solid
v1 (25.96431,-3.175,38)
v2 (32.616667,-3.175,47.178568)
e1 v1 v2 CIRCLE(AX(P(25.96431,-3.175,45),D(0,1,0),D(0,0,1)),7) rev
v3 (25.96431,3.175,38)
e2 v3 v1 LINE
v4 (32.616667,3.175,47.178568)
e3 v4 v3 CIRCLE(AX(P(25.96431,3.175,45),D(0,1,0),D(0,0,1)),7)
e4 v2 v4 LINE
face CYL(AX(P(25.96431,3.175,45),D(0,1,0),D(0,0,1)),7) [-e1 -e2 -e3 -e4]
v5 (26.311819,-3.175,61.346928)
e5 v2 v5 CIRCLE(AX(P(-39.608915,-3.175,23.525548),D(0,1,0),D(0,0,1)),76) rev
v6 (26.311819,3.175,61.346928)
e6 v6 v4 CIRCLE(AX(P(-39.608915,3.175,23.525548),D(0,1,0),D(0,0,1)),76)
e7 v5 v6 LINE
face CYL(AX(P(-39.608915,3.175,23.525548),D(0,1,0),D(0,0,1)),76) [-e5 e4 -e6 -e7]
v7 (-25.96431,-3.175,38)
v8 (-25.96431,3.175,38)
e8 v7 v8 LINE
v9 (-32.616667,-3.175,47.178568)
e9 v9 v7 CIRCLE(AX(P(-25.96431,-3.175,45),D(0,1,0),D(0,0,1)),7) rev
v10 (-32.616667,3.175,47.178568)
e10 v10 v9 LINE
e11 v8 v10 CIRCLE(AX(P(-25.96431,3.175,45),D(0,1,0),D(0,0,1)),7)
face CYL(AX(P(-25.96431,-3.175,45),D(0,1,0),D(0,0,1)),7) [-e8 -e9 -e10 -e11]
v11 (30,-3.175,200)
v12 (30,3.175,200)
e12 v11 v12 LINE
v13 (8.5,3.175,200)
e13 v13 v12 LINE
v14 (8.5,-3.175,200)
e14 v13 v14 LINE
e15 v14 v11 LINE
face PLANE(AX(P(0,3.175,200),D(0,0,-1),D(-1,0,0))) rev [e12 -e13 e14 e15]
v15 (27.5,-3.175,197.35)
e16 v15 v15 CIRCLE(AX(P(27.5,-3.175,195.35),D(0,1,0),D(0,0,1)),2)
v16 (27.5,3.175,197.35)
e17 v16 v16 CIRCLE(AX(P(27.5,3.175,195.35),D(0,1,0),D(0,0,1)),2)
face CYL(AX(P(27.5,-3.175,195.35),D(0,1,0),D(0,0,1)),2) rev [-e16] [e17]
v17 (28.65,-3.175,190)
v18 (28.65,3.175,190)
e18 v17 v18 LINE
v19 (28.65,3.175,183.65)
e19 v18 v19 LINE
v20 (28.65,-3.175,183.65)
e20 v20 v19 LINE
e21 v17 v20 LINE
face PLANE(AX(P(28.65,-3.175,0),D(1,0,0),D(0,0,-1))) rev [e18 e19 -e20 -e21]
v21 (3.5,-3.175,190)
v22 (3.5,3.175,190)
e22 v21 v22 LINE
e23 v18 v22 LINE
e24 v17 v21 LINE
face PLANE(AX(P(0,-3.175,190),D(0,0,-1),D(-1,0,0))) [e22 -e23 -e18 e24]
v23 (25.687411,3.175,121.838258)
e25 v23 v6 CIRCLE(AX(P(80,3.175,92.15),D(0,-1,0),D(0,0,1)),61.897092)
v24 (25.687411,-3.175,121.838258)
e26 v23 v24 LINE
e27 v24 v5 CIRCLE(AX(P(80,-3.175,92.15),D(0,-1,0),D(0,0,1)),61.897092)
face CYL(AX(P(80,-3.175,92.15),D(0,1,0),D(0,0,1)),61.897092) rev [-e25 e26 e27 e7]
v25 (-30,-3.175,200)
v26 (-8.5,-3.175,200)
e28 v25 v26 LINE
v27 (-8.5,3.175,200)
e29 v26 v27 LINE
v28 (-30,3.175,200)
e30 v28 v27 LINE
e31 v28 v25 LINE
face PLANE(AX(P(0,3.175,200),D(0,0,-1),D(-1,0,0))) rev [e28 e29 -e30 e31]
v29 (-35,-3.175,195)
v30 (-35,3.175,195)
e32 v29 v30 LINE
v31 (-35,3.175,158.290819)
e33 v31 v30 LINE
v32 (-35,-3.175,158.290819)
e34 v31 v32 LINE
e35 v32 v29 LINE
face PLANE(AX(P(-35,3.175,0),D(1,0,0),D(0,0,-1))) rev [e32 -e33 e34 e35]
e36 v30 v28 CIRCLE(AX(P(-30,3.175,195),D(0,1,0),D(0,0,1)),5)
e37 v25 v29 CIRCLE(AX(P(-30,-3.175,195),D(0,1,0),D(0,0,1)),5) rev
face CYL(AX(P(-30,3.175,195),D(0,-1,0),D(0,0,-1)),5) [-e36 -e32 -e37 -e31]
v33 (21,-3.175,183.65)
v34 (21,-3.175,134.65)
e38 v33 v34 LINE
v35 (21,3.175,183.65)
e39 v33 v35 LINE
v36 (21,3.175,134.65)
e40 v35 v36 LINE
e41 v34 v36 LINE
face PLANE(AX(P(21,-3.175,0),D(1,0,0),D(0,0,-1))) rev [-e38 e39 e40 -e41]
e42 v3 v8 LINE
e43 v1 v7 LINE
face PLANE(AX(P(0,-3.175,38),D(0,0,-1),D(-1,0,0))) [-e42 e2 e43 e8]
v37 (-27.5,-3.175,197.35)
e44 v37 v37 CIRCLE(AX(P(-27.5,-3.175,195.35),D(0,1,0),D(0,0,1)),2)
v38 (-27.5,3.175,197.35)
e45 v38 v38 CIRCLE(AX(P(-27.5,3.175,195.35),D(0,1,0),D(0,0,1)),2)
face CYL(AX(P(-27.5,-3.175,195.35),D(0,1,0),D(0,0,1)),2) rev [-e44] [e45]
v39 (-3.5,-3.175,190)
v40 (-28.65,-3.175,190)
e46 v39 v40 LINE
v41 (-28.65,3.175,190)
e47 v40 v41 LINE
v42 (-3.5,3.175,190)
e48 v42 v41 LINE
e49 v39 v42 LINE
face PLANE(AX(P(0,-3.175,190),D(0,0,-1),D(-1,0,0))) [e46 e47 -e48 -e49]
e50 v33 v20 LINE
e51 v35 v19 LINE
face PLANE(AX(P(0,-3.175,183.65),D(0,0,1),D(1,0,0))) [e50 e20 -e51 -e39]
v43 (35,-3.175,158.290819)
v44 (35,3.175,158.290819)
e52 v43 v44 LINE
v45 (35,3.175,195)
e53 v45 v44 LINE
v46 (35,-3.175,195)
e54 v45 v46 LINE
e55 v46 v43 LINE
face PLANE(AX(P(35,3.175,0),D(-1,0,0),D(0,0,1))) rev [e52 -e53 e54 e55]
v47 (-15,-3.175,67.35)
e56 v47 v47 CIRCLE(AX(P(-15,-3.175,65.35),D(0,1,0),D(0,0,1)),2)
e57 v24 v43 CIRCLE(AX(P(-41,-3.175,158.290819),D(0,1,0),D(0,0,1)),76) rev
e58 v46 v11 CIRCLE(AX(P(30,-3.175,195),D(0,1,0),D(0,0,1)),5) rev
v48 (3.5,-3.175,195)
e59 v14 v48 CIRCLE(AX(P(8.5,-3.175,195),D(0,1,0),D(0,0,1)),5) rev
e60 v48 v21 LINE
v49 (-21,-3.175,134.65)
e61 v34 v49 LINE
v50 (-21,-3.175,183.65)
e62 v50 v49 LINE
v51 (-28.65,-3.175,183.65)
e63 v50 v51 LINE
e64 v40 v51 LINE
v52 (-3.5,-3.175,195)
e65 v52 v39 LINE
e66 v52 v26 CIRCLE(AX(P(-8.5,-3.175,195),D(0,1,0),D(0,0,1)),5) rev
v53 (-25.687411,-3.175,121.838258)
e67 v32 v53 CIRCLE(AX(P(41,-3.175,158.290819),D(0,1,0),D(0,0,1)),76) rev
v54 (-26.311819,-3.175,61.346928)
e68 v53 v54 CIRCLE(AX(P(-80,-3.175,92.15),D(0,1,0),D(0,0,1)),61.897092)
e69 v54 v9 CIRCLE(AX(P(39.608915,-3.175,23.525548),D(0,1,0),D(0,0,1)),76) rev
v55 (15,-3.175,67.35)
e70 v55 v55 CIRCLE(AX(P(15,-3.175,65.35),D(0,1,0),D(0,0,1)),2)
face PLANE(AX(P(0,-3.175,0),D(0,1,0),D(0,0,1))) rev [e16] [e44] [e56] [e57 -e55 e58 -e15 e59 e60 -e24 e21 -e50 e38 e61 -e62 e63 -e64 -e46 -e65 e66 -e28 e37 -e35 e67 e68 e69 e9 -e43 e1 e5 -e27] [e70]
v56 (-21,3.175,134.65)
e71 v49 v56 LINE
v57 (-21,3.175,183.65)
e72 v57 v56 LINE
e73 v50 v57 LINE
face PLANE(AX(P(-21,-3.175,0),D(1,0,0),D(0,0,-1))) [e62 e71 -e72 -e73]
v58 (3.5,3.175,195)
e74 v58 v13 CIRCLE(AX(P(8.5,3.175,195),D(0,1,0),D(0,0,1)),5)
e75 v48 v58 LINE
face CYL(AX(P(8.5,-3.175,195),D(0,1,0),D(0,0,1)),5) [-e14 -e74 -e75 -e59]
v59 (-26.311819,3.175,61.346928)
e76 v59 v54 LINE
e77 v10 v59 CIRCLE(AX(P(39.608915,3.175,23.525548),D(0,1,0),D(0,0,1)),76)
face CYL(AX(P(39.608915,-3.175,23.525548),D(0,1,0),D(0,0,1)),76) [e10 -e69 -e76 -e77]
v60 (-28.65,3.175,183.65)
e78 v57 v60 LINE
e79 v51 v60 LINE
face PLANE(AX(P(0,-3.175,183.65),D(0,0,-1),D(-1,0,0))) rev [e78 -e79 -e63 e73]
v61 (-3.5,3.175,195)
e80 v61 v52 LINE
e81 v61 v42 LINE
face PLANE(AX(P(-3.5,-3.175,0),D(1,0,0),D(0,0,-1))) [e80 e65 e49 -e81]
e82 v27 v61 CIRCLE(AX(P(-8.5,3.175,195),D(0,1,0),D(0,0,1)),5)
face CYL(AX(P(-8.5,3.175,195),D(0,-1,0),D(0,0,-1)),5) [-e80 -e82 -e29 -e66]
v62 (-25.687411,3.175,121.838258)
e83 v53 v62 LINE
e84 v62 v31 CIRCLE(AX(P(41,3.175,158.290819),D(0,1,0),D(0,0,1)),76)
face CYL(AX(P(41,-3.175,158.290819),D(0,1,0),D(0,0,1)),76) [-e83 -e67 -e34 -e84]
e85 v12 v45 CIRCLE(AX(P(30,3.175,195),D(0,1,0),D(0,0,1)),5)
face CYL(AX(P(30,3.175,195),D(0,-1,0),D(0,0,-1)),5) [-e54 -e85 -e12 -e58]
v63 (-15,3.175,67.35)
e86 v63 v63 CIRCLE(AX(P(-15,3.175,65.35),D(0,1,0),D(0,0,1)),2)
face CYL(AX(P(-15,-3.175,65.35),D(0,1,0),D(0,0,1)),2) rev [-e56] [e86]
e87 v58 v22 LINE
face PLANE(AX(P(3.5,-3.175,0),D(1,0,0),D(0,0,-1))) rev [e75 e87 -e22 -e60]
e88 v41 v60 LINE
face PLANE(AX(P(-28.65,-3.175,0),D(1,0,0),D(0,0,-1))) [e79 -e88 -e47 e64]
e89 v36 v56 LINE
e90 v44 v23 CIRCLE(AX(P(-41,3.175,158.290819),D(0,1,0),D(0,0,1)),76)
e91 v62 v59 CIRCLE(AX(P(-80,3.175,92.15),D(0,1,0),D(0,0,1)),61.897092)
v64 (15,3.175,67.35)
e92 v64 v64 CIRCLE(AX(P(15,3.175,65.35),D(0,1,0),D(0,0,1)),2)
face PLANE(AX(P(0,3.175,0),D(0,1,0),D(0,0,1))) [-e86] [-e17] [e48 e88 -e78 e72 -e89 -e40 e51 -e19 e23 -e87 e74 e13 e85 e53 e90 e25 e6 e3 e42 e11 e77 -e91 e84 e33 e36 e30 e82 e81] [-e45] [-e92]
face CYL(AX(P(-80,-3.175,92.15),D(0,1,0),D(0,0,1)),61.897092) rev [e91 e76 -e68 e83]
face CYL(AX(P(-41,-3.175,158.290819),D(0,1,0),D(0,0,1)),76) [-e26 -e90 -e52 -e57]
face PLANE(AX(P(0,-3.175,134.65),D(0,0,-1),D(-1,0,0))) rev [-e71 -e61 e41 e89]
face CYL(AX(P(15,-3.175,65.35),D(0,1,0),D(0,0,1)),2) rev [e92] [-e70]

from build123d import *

# Parameters (mm, degrees)
BOSS_EXTRUDE1_DEPTH = 3.175
CUT_EXTRUDE1_DEPTH  = 204.138678001
SKETCH3_W           = 42
SKETCH3_H           = 55.35
SKETCH3_W_2         = 7
SKETCH3_H_2         = 10
SKETCH3_W_3         = 7.65
SKETCH3_H_3         = 6.35
CUT_EXTRUDE2_DEPTH  = 204.138678001
FILLET3_R           = 5
SKETCH4_R           = 2
CUT_EXTRUDE3_DEPTH  = 204.138678001
CUT_EXTRUDE4_DEPTH  = 204.138678001
FILLET4_R           = 76
FILLET5_R           = 7


with BuildPart() as part:
    # Sketch1 → Boss-Extrude1 (new, symmetric)
    with BuildSketch(Plane(origin=(0, 0, 0), x_dir=(1, 0, 0), z_dir=(0, 1, 0))):
        with BuildLine():
            Line((35, -200), (35, 0))
            ThreePointArc((35, 0), (0, 35), (-35, 0))
            Line((-35, 0), (-35, -200))
            Line((-35, -200), (35, -200))
        make_face()
    extrude(amount=BOSS_EXTRUDE1_DEPTH, both=True)

    # Sketch2 → Cut-Extrude1 (cut, through all)
    with BuildSketch(Plane(origin=(0, 3.175, 0), x_dir=(1, 0, 0), z_dir=(0, 1, 0))):
        with BuildLine():
            Line((-35, -38), (35, -38))
            Line((35, -38), (35, 0))
            ThreePointArc((35, 0), (0, 35), (-35, 0))
            Line((-35, 0), (-35, -38))
        make_face()
    extrude(amount=-CUT_EXTRUDE1_DEPTH, mode=Mode.SUBTRACT)

    # Sketch3 → Cut-Extrude2 (cut, through all)
    with BuildSketch(Plane(origin=(0, 3.175, 0), x_dir=(1, 0, 0), z_dir=(0, 1, 0))):
        with Locations((0, -162.325)):
            Rectangle(SKETCH3_W, SKETCH3_H)
        with Locations((0, -195)):
            Rectangle(SKETCH3_W_2, SKETCH3_H_2)
        with Locations((-24.825, -186.825)):
            Rectangle(SKETCH3_W_3, SKETCH3_H_3)
        with Locations((24.825, -186.825)):
            Rectangle(SKETCH3_W_3, SKETCH3_H_3)
    extrude(amount=-CUT_EXTRUDE2_DEPTH, mode=Mode.SUBTRACT)

    # Fillet3
    fillet3_edges = [part.edges().sort_by_distance(p)[0] for p in [
        (3.5, 0, 200),
        (-3.5, 0, 200),
        (35, 0, 200),
        (-35, 0, 200),
    ]]
    fillet(fillet3_edges, radius=FILLET3_R)

    # Sketch4 → Cut-Extrude3 (cut, through all)
    with BuildSketch(Plane(origin=(0, 3.175, 0), x_dir=(1, 0, 0), z_dir=(0, 1, 0))):
        with Locations(Location((15, -65.35, 0), (0, 0, 270))):
            Circle(SKETCH4_R)
        with Locations(Location((-15, -65.35, 0), (0, 0, 270))):
            Circle(SKETCH4_R)
        with Locations(Location((27.5, -195.35, 0), (0, 0, 270))):
            Circle(SKETCH4_R)
        with Locations(Location((-27.5, -195.35, 0), (0, 0, 270))):
            Circle(SKETCH4_R)
    extrude(amount=-CUT_EXTRUDE3_DEPTH, mode=Mode.SUBTRACT)

    # Sketch5 → Cut-Extrude4 (cut, through all)
    with BuildSketch(Plane(origin=(0, 3.175, 0), x_dir=(1, 0, 0), z_dir=(0, 1, 0))):
        with BuildLine():
            Line((-35, -134.65), (-35, -49.65))
            ThreePointArc((-35, -49.65), (-18.102907984, -92.15), (-35, -134.65))
        make_face()
    cut_extrude4 = extrude(amount=-CUT_EXTRUDE4_DEPTH, mode=Mode.SUBTRACT)

    # Mirror1: Cut-Extrude4 across plane
    add(cut_extrude4.mirror(Plane(origin=(0, 0, 0), x_dir=(0, 0, 1), z_dir=(1, 0, 0))), mode=Mode.SUBTRACT)

    # Fillet4
    # the kernel refuses this fillet: 76 mm, written as the material it takes off along each edge
    with BuildSketch(Plane(origin=(-35, 39.601520625, 49.65), x_dir=(0, 0, -1), z_dir=(0, -1, 0))) as fillet4_piece_1:
        with BuildLine():
            CenterArc((26.124451555, 74.608915367), FILLET4_R, 240.155370723, 18.865389254)
            Line((-11.696928446, 8.688181035), (-12.453356046, 7.369766348))
            ThreePointArc((-12.453356046, 7.369766348), (-6.498269887, 3.469254885), (-1.04366777, -1.105059992))
            Line((-1.04366777, -1.105059992), (0, -1.52))
            ThreePointArc((0, -1.52), (5.825, -1.52), (11.360510969, -1.492178307))
            Line((11.360510969, -1.492178307), (11.65, 0))
        make_face()
    extrude(amount=79.20304125, mode=Mode.SUBTRACT)
    with BuildSketch(Plane(origin=(-35, 62.277048415, 134.65), x_dir=(0.587963491001448, 0, -0.8088874663693276), z_dir=(0, -1, 0))) as fillet4_piece_2:
        with BuildLine():
            CenterArc((25.562462836, 75.375386129), FILLET4_R, 233.987375861, 28.66182532)
            Line((-19.12276248, 13.899938684), (-20.016466986, 12.670429736))
            Line((-20.016466986, 12.670429736), (-0.893704506, -1.229508949))
            Line((-0.893704506, -1.229508949), (0.194474848, -1.507507723))
            ThreePointArc((0.194474848, -1.507507723), (7.919360226, -1.011292338), (15.644245604, -1.507507723))
            Line((15.644245604, -1.507507723), (15.838720451, 0))
        make_face()
    extrude(amount=124.554096829, mode=Mode.SUBTRACT)
    with BuildSketch(Plane(origin=(35, 62.277048415, 134.65), x_dir=(-0.587963491001448, 0, -0.8088874663693276), z_dir=(0, -1, 0))) as fillet4_piece_3:
        with BuildLine():
            CenterArc((25.562462836, -75.375386129), FILLET4_R, 97.350798819, 28.66182532)
            Line((-19.12276248, -13.899938684), (-20.016466986, -12.670429736))
            Line((-20.016466986, -12.670429736), (-0.893704506, 1.229508949))
            Line((-0.893704506, 1.229508949), (0.194474848, 1.507507723))
            ThreePointArc((0.194474848, 1.507507723), (7.919360226, 1.011292338), (15.644245604, 1.507507723))
            Line((15.644245604, 1.507507723), (15.838720451, 0))
        make_face()
    extrude(amount=124.554096829, mode=Mode.SUBTRACT)
    with BuildSketch(Plane(origin=(35, 39.601520625, 49.65), x_dir=(0, 0, -1), z_dir=(0, -1, 0))) as fillet4_piece_4:
        with BuildLine():
            CenterArc((26.124451555, -74.608915367), FILLET4_R, 100.979240023, 18.865389254)
            Line((-11.696928446, -8.688181035), (-12.453356046, -7.369766348))
            ThreePointArc((-12.453356046, -7.369766348), (-6.498269887, -3.469254885), (-1.04366777, 1.105059992))
            Line((-1.04366777, 1.105059992), (0, 1.52))
            ThreePointArc((0, 1.52), (5.825, 1.52), (11.360510969, 1.492178307))
            Line((11.360510969, 1.492178307), (11.65, 0))
        make_face()
    extrude(amount=79.20304125, mode=Mode.SUBTRACT)

    # Fillet5
    fillet5_edges = [part.edges().sort_by_distance(p)[0] for p in [
        (35, 0, 38),
        (-35, 0, 38),
    ]]
    fillet(fillet5_edges, radius=FILLET5_R)


solid = part.part
